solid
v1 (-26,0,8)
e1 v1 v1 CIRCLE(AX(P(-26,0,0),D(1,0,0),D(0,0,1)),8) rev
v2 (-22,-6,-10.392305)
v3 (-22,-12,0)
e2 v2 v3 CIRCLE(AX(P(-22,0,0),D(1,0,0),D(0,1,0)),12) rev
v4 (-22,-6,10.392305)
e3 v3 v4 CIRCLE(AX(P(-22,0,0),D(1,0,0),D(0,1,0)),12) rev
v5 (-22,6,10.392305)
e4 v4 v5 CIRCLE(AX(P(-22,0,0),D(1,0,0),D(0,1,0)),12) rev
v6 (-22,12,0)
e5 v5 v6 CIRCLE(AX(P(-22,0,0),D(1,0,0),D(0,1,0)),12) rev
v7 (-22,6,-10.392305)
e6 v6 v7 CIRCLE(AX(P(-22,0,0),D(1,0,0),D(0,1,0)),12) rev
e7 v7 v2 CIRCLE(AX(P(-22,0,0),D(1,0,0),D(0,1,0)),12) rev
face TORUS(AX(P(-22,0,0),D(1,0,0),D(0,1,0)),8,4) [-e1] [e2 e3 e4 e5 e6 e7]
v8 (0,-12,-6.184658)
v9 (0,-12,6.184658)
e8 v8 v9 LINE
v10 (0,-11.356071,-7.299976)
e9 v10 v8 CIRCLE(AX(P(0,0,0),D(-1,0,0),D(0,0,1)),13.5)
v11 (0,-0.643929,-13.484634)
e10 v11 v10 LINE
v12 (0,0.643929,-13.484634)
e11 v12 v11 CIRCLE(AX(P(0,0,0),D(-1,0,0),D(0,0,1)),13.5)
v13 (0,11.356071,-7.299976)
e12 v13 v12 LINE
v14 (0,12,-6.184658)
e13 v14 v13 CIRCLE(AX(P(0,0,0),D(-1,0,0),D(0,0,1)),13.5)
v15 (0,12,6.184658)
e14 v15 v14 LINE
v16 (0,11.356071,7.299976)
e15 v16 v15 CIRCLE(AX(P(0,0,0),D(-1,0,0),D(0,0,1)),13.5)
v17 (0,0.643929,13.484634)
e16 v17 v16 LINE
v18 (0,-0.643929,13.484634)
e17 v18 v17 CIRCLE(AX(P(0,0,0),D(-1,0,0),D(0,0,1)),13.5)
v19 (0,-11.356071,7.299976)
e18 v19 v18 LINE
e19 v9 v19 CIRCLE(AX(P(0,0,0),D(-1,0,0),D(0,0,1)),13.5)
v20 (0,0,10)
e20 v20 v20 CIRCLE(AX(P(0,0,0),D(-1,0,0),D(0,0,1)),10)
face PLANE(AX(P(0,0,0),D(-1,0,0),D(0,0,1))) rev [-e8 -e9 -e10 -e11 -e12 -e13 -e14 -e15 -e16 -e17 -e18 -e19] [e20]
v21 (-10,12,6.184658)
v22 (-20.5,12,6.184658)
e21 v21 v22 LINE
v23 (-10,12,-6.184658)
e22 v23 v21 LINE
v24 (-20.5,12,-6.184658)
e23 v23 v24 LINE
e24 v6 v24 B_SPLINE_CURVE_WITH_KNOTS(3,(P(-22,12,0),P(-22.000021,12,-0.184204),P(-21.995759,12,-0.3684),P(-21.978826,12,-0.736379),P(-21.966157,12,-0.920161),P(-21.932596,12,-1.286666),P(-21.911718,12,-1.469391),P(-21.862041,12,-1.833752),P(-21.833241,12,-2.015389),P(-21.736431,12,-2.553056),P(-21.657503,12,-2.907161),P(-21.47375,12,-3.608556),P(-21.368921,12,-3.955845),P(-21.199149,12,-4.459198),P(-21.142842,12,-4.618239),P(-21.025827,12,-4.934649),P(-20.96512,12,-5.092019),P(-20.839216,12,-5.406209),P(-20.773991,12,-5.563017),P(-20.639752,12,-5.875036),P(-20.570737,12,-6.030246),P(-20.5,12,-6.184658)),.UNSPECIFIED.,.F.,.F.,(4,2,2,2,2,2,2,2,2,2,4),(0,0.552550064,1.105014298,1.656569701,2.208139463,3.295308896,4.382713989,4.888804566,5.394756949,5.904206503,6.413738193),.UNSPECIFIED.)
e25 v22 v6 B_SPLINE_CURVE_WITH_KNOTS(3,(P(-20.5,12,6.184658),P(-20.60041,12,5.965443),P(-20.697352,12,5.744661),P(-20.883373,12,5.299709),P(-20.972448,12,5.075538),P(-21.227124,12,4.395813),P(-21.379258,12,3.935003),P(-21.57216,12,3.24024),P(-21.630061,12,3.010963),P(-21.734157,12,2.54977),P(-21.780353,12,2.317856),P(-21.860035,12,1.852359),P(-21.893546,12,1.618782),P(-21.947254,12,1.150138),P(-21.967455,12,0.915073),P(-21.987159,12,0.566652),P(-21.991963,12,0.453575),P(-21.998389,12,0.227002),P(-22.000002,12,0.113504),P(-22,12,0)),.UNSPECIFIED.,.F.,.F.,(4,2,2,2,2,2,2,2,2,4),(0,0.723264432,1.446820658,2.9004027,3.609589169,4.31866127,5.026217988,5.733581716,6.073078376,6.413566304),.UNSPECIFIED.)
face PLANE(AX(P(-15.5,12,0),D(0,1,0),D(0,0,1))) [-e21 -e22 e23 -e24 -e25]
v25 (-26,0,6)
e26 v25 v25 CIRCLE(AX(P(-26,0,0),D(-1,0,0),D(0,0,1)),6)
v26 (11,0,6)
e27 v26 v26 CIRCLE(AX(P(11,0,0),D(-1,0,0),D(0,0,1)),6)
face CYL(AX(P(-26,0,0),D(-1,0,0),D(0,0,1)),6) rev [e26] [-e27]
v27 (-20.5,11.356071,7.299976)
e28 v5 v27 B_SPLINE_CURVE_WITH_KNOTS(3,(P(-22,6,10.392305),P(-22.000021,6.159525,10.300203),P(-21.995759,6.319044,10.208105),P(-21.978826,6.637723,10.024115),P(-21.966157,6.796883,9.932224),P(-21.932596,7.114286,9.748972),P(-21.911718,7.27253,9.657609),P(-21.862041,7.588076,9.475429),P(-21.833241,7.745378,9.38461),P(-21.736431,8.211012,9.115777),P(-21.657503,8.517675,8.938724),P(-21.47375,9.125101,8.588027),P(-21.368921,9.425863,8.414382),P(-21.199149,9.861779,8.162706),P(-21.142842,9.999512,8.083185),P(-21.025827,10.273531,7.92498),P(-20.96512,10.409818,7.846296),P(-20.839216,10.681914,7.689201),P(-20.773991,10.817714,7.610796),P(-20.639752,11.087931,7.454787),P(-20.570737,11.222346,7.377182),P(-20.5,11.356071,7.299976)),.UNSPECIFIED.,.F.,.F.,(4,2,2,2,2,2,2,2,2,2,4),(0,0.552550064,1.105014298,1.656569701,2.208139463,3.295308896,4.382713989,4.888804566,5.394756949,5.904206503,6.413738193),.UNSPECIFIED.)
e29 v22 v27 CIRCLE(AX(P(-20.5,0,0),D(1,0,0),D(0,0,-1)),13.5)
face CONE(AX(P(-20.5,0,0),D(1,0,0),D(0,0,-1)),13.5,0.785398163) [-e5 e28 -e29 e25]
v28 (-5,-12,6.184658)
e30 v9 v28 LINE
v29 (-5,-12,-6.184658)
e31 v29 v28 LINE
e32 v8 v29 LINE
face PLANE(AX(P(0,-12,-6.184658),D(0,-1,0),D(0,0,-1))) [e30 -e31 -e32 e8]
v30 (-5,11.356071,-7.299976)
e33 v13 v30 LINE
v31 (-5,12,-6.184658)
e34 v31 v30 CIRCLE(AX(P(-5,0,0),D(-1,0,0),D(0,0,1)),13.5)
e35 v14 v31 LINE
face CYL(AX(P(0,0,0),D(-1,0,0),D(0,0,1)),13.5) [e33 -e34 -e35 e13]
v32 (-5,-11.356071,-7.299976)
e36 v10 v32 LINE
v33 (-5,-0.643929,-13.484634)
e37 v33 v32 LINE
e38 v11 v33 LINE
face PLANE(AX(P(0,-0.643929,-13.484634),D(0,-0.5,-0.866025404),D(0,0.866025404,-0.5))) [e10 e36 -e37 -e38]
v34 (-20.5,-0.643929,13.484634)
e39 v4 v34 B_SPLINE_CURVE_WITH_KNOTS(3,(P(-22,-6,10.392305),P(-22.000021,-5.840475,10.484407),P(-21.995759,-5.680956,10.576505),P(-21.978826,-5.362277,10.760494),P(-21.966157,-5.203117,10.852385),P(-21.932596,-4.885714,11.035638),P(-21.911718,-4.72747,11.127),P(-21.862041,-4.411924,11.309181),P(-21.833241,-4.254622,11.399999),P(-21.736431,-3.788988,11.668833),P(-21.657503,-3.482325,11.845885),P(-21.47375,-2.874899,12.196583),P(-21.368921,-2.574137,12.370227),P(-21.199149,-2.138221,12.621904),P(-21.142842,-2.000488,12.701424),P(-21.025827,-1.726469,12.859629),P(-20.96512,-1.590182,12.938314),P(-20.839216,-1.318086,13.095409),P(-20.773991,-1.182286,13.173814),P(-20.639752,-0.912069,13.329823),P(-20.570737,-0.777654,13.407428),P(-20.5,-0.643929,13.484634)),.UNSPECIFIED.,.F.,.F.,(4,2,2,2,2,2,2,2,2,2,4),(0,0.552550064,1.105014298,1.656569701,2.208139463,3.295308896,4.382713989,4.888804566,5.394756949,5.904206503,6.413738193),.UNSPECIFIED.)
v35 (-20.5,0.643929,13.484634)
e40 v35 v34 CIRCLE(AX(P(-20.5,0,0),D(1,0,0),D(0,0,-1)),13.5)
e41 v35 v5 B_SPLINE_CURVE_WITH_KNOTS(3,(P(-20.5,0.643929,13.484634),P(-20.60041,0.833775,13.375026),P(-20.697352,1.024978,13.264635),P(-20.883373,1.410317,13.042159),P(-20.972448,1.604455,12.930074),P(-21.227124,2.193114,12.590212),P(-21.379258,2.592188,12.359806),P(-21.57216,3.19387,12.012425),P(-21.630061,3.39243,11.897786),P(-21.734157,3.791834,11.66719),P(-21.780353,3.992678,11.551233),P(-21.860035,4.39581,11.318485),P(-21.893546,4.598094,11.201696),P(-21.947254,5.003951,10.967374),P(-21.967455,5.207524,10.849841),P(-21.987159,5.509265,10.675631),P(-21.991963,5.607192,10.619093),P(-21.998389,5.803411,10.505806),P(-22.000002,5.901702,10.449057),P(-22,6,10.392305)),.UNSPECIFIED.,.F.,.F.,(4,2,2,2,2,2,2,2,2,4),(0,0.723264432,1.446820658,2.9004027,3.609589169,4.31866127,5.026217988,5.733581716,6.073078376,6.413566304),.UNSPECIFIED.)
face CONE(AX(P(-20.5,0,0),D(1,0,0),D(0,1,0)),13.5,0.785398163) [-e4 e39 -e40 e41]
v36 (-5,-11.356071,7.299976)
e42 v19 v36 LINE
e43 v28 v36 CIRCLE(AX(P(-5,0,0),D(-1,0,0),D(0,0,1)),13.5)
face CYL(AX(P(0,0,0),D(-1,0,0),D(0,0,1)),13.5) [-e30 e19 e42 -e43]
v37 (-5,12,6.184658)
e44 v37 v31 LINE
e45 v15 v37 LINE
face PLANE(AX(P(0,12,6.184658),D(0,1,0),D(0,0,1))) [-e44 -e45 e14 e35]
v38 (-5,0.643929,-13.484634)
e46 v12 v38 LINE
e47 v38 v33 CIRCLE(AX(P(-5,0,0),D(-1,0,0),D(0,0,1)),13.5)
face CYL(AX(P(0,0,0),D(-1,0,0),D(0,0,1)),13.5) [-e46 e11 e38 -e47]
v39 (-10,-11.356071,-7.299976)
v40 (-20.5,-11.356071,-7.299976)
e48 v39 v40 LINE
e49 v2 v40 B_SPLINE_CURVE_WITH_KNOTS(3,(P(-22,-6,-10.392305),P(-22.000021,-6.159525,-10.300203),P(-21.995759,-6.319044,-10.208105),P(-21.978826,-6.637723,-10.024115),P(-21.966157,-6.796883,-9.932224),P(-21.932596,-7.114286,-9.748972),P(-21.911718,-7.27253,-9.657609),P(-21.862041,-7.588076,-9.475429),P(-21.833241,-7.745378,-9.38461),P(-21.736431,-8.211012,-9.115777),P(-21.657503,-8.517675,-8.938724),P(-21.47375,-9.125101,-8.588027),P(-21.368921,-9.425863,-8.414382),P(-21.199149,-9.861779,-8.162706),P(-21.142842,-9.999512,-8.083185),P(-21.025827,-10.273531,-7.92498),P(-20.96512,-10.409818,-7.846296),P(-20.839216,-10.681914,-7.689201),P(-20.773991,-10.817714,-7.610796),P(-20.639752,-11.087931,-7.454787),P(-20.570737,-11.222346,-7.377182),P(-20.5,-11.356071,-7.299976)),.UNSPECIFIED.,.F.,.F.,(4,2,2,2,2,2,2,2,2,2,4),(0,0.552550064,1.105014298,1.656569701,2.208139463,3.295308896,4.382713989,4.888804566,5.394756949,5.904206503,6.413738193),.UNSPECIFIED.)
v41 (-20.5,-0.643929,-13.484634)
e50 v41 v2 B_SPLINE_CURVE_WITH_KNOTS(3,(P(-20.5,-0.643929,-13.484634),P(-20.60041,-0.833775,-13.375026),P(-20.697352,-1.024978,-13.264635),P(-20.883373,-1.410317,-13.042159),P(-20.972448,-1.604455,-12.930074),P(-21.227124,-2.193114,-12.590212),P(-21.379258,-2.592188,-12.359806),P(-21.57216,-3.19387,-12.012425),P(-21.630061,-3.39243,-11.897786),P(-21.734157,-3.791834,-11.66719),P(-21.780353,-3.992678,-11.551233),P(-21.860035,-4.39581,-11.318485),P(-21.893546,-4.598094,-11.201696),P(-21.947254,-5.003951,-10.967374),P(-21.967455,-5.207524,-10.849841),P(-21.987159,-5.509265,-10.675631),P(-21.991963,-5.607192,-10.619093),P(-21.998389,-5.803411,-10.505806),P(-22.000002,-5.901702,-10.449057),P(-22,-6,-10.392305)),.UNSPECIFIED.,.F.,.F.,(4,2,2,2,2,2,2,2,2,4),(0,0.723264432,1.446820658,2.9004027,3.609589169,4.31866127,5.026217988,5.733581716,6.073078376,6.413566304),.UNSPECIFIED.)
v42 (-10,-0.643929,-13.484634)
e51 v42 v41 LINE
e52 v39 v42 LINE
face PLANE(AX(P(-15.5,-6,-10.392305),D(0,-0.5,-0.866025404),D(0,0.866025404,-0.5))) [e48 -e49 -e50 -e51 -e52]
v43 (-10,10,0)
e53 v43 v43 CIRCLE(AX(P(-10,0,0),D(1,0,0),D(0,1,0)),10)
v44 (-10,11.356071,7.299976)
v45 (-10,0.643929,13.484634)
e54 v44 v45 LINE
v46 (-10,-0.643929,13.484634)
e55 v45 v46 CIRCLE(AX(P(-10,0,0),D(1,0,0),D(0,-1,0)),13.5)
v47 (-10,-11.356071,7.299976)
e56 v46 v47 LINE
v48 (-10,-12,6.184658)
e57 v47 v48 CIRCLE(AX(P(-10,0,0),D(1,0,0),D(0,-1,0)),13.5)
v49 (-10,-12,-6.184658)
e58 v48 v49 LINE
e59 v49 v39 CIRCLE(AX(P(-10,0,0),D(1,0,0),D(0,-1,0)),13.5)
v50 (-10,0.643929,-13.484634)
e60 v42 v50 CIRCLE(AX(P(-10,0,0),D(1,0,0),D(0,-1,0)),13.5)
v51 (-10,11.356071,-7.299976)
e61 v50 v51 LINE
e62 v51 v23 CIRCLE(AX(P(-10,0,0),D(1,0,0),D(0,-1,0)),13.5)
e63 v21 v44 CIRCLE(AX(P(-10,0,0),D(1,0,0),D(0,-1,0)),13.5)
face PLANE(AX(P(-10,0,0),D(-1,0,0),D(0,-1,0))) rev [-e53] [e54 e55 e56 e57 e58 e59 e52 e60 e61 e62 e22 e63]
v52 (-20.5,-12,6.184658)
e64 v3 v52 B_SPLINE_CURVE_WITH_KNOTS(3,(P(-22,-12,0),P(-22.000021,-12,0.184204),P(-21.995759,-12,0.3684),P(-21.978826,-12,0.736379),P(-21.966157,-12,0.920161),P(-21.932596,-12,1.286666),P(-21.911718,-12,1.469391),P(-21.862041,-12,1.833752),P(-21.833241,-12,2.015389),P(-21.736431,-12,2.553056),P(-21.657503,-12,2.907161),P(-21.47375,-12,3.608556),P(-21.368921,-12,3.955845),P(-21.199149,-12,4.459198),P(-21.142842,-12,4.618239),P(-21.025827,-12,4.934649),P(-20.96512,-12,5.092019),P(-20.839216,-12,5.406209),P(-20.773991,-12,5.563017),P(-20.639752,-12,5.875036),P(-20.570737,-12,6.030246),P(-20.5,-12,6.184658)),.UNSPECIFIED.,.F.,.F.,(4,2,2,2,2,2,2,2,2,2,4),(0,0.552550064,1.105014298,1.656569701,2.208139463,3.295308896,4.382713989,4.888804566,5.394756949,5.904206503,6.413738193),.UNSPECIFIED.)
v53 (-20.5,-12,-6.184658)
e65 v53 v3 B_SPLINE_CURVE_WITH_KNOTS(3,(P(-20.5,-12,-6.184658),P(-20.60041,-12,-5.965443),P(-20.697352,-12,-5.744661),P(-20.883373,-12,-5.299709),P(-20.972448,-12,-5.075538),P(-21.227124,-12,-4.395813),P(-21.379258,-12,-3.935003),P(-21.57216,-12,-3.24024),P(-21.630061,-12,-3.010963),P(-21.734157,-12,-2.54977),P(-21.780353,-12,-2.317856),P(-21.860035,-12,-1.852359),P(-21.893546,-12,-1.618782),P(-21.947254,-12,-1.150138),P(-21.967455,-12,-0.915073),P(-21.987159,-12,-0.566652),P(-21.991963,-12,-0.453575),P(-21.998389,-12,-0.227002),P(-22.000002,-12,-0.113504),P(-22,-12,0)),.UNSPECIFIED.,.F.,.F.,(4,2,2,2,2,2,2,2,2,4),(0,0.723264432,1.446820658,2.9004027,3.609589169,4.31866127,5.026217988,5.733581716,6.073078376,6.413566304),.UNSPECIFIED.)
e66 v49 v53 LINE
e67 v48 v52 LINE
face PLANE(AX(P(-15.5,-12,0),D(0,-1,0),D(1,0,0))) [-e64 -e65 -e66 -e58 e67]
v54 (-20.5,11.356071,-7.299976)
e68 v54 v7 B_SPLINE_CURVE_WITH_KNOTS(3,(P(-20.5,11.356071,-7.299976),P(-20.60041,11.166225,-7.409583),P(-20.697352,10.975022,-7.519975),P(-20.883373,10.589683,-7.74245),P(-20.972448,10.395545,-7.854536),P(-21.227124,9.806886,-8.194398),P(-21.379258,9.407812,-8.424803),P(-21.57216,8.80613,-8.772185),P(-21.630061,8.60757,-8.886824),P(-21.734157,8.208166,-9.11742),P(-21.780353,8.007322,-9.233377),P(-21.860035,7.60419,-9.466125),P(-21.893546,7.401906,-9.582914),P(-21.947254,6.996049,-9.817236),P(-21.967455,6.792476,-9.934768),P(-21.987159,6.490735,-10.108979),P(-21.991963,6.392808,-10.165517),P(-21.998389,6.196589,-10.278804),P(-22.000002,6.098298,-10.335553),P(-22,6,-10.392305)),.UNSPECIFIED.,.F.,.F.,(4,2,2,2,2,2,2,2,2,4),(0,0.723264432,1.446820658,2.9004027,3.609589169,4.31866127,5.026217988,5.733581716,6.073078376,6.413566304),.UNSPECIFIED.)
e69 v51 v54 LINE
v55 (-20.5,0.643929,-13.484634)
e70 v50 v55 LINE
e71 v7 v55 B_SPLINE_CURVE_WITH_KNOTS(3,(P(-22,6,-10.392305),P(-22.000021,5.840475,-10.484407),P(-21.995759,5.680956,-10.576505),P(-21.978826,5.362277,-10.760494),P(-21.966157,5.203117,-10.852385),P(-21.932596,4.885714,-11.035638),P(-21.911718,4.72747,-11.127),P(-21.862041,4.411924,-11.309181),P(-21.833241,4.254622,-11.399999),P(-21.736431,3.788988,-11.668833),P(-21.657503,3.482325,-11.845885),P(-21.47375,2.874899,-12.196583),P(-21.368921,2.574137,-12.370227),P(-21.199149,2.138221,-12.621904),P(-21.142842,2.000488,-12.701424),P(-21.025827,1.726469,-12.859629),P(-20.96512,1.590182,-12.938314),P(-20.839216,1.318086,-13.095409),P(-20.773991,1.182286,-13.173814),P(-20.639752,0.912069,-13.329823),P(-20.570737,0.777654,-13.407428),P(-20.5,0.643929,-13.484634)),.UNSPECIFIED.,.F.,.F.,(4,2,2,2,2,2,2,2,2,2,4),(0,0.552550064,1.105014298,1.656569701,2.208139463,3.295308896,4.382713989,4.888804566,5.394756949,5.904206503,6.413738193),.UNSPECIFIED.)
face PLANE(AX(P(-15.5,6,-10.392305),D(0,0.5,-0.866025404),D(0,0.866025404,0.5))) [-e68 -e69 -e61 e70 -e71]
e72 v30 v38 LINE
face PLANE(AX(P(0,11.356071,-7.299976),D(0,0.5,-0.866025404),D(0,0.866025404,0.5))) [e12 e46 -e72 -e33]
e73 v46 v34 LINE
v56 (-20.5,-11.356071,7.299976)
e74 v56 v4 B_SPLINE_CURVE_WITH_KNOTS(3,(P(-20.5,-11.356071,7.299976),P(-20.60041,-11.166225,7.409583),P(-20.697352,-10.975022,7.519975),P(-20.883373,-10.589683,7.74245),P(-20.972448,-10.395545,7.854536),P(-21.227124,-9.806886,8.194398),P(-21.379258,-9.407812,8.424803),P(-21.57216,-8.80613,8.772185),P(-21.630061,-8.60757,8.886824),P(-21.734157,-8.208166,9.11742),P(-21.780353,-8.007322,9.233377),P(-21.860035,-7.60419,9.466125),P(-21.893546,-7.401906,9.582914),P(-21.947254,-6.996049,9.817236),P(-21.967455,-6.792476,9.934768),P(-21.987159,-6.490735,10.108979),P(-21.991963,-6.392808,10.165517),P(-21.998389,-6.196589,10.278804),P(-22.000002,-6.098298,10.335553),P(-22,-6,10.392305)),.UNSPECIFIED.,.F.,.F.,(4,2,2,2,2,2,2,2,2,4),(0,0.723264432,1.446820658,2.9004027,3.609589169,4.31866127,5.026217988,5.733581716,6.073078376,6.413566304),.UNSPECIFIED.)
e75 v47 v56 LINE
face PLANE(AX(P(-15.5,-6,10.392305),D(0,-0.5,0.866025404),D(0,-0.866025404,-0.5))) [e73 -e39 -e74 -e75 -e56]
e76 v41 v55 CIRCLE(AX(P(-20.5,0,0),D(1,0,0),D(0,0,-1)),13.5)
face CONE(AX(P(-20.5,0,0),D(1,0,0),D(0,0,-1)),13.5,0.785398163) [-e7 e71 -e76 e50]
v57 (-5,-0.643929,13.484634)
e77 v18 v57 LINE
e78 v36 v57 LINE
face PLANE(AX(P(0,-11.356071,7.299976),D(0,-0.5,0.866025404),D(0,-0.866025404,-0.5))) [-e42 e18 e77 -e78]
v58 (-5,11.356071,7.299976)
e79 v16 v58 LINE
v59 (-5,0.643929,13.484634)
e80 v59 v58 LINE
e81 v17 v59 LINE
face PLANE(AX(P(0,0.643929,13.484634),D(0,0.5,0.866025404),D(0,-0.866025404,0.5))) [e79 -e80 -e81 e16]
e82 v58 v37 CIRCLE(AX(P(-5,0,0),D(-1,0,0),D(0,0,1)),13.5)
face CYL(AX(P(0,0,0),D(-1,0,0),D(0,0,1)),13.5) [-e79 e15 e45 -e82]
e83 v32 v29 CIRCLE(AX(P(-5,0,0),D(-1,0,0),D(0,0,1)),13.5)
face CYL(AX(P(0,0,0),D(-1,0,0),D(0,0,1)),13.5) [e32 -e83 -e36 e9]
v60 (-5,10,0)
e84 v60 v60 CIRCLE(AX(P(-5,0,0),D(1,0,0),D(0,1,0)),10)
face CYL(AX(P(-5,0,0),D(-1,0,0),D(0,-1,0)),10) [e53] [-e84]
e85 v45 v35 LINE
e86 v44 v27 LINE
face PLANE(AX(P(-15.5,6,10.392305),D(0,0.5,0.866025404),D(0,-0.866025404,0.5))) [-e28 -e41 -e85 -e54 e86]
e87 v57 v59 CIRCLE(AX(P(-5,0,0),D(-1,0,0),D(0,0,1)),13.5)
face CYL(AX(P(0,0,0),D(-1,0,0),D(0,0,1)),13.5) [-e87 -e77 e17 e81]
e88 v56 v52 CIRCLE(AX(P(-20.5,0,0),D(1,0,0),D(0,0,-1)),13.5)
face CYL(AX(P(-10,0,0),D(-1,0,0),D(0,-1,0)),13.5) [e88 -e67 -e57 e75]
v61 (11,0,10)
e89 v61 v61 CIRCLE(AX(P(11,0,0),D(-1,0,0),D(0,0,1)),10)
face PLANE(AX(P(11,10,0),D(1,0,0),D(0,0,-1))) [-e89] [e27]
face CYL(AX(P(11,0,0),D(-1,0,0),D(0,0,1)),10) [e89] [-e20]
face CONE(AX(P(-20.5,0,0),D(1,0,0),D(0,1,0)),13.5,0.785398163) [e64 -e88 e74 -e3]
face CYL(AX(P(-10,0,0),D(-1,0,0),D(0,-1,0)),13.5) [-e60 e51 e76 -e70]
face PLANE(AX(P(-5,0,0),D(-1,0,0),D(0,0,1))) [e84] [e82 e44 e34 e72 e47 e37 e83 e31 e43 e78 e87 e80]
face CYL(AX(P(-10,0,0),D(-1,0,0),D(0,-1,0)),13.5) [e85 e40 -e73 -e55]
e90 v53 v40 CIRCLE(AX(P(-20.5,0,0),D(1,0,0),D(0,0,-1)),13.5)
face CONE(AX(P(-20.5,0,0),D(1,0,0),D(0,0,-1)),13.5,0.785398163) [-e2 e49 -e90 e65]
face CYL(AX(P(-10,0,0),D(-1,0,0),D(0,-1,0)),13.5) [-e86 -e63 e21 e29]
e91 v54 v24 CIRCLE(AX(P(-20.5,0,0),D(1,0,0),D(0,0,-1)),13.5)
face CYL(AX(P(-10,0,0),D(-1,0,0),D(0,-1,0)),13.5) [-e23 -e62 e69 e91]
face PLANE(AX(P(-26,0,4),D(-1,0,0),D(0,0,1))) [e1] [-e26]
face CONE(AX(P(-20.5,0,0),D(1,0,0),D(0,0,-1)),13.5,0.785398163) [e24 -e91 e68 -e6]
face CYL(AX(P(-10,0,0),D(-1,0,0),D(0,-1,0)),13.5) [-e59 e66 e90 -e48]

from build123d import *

# Parameters (mm, degrees)
BOSS_EXTRUDE1_DEPTH        = 10.5
BOSS_EXTRUDE1_2_OUTLINE_W  = 8
BOSS_EXTRUDE1_2_OUTLINE_H  = 5.5
BOSS_EXTRUDE1_START        = -23
BOSS_EXTRUDE1_3_DEPTH      = 2.5
SKETCH2_R                  = 10
BOSS_EXTRUDE2_DEPTH        = 5
BOSS_EXTRUDE3_DEPTH        = 5
SKETCH4_W                  = 11
SKETCH4_H                  = 10
F_12_0_12_DIAMETER_HOLE1_D = 12


with BuildPart() as part:
    # Boss-Extrude1: read off the stored shape, not the designer's step
    # Boss-Extrude1 outline → Boss-Extrude1 (new body)
    with BuildSketch(Plane(origin=(-20.5, 0, 0), x_dir=(0, 0, -1), z_dir=(1, 0, 0))):
        with BuildLine():
            ThreePointArc((-6.184658438, 12), (-6.75, 11.691342951), (-7.299975626, 11.356071321))
            Line((-7.299975626, 11.356071321), (-13.484634065, 0.643928679))
            ThreePointArc((-13.484634065, 0.643928679), (-13.5, 0), (-13.484634065, -0.643928679))
            Line((-13.484634065, -0.643928679), (-7.299975626, -11.356071321))
            ThreePointArc((-7.299975626, -11.356071321), (-6.75, -11.691342951), (-6.184658438, -12))
            Line((-6.184658438, -12), (6.184658438, -12))
            ThreePointArc((6.184658438, -12), (6.75, -11.691342951), (7.299975626, -11.356071321))
            Line((7.299975626, -11.356071321), (13.484634065, -0.643928679))
            ThreePointArc((13.484634065, -0.643928679), (13.5, 0), (13.484634065, 0.643928679))
            Line((13.484634065, 0.643928679), (7.299975626, 11.356071321))
            ThreePointArc((7.299975626, 11.356071321), (6.75, 11.691342951), (6.184658438, 12))
            Line((6.184658438, 12), (-6.184658438, 12))
        make_face()
    extrude(amount=BOSS_EXTRUDE1_DEPTH)

    # Boss-Extrude1 2 outline → Boss-Extrude1 2 (revolve)
    with BuildSketch(Plane.YX):
        with BuildLine():
            ThreePointArc((8, -26), (10.828427125, -24.828427125), (12, -22))
            Line((12, -22), (13.5, -20.5))
            Line((13.5, -20.5), (8, -20.5))
            Line((8, -20.5), (8, -26))
        make_face()
        with Locations((4, -23.25)):
            Rectangle(BOSS_EXTRUDE1_2_OUTLINE_W, BOSS_EXTRUDE1_2_OUTLINE_H)
    revolve(axis=Axis((0, 0, 0), (1, 0, 0)))

    # Boss-Extrude1 3 outline → Boss-Extrude1 3 (cut)
    with BuildSketch(Plane.YZ.offset(BOSS_EXTRUDE1_START)):
        Polygon((0.643928679, 13.484634065), (11.356071321, 7.299975626), (12, 6.92820323), (12, 15), (1.980762112, 15), (0, 13.856406461), align=None)
        Polygon((15, 5.196152422), (12, 6.92820323), (12, -6.92820323), (15, -5.196152422), align=None)
        Polygon((-0.643928679, 13.484634065), (0, 13.856406461), (-1.980762112, 15), (-12, 15), (-12, 6.92820323), (-11.356071321, 7.299975626), align=None)
        Polygon((12, -15), (12, -6.92820323), (11.356071321, -7.299975626), (0.643928679, -13.484634065), (0, -13.856406461), (1.980762112, -15), align=None)
        Polygon((-12, -6.92820323), (-12, 6.92820323), (-15, 5.196152422), (-15, -5.196152422), align=None)
        Polygon((-1.980762112, -15), (0, -13.856406461), (-0.643928679, -13.484634065), (-11.356071321, -7.299975626), (-12, -6.92820323), (-12, -15), align=None)
    extrude(amount=BOSS_EXTRUDE1_3_DEPTH, mode=Mode.SUBTRACT)

    # Sketch2 → Boss-Extrude2 (add)
    with BuildSketch(Plane(origin=(-10, 0, 0), x_dir=(0, 0, -1), z_dir=(1, 0, 0))):
        with Locations(Location((0, 0, 0), (0, 0, 90))):
            Circle(SKETCH2_R)
    extrude(amount=BOSS_EXTRUDE2_DEPTH)

    # Sketch3 → Boss-Extrude3 (add)
    with BuildSketch(Plane(origin=(-5, 0, 0), x_dir=(0, -1, 0), z_dir=(-1, 0, 0))):
        with BuildLine():
            Line((12, -6.184658438), (12, 6.184658438))
            ThreePointArc((12, 6.184658438), (11.691342951, 6.75), (11.356071321, 7.299975626))
            Line((11.356071321, 7.299975626), (0.643928679, 13.484634065))
            ThreePointArc((0.643928679, 13.484634065), (0, 13.5), (-0.643928679, 13.484634065))
            Line((-0.643928679, 13.484634065), (-11.356071321, 7.299975626))
            ThreePointArc((-11.356071321, 7.299975626), (-11.691342951, 6.75), (-12, 6.184658438))
            Line((-12, 6.184658438), (-12, -6.184658438))
            ThreePointArc((-12, -6.184658438), (-11.691342951, -6.75), (-11.356071321, -7.299975626))
            Line((-11.356071321, -7.299975626), (-0.643928679, -13.484634065))
            ThreePointArc((-0.643928679, -13.484634065), (0, -13.5), (0.643928679, -13.484634065))
            Line((0.643928679, -13.484634065), (11.356071321, -7.299975626))
            ThreePointArc((11.356071321, -7.299975626), (11.691342951, -6.75), (12, -6.184658438))
        make_face()
    extrude(amount=-BOSS_EXTRUDE3_DEPTH)

    # Sketch4 → Revolve1 (revolve)
    with BuildSketch(Plane(origin=(0, 0, 0), x_dir=(-1, 0, 0), z_dir=(0, 0, -1)), mode=Mode.PRIVATE) as revolve1_sk:
        with Locations((-5.5, 5)):
            Rectangle(SKETCH4_W, SKETCH4_H)
    revolve(revolve1_sk.sketch.rotate(Axis((11, 0, 0), (-1, 0, 0)), 270), axis=Axis((11, 0, 0), (-1, 0, 0)))

    # Ø12.0 (12) Diameter Hole1 (through all)
    with Locations(Plane.ZY.offset(26)):
        with Locations((0, 0)):
            Hole(F_12_0_12_DIAMETER_HOLE1_D / 2)


solid = part.part
